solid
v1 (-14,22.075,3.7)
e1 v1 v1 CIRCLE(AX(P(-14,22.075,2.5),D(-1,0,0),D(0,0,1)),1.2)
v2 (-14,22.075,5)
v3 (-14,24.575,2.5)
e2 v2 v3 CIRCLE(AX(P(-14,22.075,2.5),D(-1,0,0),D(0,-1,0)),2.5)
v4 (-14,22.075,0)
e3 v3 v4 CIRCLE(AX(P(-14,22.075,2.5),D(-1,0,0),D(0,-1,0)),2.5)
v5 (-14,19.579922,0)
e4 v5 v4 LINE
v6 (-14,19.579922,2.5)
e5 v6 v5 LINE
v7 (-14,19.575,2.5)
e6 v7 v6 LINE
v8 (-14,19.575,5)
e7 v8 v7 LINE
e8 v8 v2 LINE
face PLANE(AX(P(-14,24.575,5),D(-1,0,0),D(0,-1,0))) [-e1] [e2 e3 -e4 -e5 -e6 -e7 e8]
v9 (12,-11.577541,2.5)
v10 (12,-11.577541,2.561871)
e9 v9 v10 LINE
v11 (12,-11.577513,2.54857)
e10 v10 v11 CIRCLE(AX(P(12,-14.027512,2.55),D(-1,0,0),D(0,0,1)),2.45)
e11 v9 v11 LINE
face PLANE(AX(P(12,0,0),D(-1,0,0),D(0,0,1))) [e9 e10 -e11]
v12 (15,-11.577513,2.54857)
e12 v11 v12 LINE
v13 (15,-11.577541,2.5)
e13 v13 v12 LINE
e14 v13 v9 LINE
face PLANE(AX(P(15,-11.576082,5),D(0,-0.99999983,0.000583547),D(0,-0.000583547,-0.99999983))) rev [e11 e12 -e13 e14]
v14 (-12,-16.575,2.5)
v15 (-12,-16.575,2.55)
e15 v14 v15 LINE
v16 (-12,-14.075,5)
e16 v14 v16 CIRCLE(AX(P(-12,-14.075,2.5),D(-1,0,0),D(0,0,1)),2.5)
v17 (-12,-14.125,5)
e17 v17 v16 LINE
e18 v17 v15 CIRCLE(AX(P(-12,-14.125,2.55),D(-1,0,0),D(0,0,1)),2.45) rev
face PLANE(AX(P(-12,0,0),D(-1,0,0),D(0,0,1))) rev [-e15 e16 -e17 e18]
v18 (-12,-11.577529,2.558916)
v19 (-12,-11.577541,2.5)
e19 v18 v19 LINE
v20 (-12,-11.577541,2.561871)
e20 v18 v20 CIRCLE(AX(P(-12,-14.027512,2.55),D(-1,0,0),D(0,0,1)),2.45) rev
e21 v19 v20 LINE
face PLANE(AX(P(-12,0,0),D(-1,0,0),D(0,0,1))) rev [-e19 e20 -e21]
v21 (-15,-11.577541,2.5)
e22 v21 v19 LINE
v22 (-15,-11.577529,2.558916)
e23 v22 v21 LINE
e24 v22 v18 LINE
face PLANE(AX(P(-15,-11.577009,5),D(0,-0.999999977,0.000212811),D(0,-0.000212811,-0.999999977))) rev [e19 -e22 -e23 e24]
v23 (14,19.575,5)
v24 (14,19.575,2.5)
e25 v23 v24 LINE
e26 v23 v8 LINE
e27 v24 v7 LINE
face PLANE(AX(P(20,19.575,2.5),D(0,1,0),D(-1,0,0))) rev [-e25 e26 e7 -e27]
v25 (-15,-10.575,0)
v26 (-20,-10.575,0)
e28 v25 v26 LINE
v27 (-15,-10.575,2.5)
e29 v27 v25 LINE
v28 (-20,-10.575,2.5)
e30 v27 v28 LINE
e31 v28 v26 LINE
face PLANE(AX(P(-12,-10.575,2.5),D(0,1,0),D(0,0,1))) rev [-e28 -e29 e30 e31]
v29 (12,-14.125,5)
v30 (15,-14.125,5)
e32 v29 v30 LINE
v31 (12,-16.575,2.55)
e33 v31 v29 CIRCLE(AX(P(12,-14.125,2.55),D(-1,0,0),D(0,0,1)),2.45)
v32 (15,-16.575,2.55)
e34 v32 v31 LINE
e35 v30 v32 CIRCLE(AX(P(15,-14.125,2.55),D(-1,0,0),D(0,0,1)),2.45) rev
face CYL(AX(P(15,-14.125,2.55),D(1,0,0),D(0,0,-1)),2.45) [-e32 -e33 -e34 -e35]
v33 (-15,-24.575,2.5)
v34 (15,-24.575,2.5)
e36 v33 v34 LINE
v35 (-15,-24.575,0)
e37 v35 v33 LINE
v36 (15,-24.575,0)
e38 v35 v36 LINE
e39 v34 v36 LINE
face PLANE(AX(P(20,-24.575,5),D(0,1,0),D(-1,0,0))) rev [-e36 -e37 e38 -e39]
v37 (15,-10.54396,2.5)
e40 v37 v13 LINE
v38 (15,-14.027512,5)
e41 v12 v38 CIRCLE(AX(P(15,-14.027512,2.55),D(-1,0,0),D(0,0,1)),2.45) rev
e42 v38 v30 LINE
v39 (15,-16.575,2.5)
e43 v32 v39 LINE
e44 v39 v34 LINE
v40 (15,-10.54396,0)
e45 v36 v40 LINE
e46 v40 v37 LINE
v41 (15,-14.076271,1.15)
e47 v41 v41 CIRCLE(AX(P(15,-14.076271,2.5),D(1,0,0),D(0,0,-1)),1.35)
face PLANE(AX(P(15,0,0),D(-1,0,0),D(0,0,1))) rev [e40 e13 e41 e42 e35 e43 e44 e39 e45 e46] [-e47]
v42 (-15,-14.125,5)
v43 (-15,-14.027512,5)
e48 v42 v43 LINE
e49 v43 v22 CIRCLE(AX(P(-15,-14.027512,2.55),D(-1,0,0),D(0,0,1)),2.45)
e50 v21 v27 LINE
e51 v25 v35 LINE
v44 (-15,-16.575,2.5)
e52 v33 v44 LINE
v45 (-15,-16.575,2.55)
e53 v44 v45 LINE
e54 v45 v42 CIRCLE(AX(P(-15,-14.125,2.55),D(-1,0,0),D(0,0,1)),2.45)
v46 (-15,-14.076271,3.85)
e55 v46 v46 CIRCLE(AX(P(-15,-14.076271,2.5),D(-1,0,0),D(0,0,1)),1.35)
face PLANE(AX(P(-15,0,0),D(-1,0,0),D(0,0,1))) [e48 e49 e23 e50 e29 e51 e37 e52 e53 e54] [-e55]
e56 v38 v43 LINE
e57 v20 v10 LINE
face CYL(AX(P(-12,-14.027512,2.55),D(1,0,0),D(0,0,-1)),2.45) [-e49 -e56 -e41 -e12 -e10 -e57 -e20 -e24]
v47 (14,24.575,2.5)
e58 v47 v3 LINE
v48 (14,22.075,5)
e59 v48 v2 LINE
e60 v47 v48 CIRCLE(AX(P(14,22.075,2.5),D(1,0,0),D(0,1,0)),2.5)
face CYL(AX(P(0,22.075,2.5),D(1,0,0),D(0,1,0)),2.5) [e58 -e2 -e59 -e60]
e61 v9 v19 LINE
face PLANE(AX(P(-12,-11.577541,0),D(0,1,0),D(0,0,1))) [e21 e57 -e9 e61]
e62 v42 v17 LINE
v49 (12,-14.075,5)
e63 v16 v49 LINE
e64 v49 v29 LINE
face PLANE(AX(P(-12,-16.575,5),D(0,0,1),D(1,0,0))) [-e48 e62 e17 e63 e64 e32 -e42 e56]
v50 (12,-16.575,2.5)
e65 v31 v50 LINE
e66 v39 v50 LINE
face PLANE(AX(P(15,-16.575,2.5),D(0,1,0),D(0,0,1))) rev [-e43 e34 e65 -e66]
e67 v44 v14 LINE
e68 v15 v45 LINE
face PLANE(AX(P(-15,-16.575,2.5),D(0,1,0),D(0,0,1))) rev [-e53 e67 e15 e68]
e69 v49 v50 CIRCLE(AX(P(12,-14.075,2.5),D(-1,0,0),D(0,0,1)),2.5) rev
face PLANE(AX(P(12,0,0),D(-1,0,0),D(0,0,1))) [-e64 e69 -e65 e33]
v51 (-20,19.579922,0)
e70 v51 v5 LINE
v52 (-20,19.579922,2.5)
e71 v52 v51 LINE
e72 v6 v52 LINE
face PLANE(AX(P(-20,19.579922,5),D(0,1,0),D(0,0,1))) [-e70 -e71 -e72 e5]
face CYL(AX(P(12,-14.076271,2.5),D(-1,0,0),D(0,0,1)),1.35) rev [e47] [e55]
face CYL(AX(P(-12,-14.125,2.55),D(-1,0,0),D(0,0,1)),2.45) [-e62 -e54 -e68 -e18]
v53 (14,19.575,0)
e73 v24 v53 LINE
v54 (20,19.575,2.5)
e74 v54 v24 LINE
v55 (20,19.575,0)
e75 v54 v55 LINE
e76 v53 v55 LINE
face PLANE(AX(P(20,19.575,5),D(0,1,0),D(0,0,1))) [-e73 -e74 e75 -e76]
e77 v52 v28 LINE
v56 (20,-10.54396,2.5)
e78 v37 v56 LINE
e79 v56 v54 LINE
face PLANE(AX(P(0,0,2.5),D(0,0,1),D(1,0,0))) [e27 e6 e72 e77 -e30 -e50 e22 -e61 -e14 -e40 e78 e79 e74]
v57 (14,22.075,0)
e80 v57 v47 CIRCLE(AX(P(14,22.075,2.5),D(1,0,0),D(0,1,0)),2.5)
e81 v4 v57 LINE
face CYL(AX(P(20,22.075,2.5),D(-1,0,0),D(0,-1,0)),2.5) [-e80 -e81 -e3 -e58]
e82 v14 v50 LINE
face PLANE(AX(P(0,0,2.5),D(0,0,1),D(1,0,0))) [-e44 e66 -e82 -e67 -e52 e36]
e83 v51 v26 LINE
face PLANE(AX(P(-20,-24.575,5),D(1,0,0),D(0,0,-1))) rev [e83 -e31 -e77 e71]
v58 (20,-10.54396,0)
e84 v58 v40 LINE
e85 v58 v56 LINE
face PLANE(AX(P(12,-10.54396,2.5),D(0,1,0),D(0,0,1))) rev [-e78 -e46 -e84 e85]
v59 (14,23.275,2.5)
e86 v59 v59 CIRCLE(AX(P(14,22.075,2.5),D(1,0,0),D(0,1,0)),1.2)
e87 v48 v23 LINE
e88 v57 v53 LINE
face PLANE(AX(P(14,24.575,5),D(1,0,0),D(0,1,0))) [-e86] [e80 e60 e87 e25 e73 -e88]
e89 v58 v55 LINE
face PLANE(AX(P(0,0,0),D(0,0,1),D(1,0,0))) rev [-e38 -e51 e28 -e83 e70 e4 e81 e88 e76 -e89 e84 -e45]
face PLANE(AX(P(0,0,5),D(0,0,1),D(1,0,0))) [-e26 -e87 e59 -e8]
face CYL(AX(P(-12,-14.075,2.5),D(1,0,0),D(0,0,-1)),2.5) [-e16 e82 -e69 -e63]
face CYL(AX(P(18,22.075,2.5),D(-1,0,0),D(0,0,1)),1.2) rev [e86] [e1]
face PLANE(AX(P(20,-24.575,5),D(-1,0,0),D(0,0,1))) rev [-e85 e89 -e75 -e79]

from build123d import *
from OCP.BRepAlgoAPI import BRepAlgoAPI_Cut
from OCP.TopTools import TopTools_ListOfShape
from OCP.BRepFilletAPI import BRepFilletAPI_MakeFillet

# Parameters (mm, degrees)
CROQUIS1_W              = 40
CROQUIS1_H              = 49.15
SALIENTE_EXTRUIR1_DEPTH = 5
CROQUIS5_W              = 6
CROQUIS5_H              = 4.995078359
CROQUIS5_H_2            = 5
CORTAR_EXTRUIR4_DEPTH   = 5
CROQUIS9_R              = 1.2
CORTAR_EXTRUIR8_DEPTH   = 32
REDONDEO1_R             = 2.5
CROQUIS12_W             = 39.999999512
CROQUIS12_H             = 44.15
CORTAR_EXTRUIR10_DEPTH  = 2.5
CROQUIS15_W             = 6
CROQUIS15_H             = 2.537629209
CORTAR_EXTRUIR11_DEPTH  = 0.01
CROQUIS17_W             = 2.5
CROQUIS17_H             = 4.997458943
SALIENTE_EXTRUIR2_DEPTH = 40
REDONDEO3_R             = 2.45
CROQUIS22_W             = 14
CROQUIS22_H             = 5
CORTAR_EXTRUIR13_DEPTH  = 5
CROQUIS25_W             = 5
CROQUIS25_H             = 7.03748993
CORTAR_EXTRUIR15_DEPTH  = 8
CROQUIS26_W             = 5
CROQUIS26_H             = 7
CORTAR_EXTRUIR16_DEPTH  = 8
CROQUIS29_W             = 5
CROQUIS29_H             = 4.997458943
SALIENTE_EXTRUIR3_DEPTH = 24
CROQUIS30_R             = 1.35
CORTAR_EXTRUIR17_DEPTH  = 24
REDONDEO4_R             = 2.5
REDONDEO4_R_2           = 2.4
CROQUIS31_W             = 2.5
CROQUIS31_H             = 4.997458943
CORTAR_EXTRUIR18_DEPTH  = 24
CROQUIS32_W             = 8.001194755
CROQUIS32_H             = 7
CORTAR_EXTRUIR19_DEPTH  = 2.5
CROQUIS33_W             = 8.001407562
CROQUIS33_H             = 6.993550445
CORTAR_EXTRUIR20_DEPTH  = 2.5
CROQUIS36_R             = 1.35
SALIENTE_EXTRUIR4_DEPTH = 3
SALIENTE_EXTRUIR5_START = 3
CROQUIS37_R             = 1.35
SALIENTE_EXTRUIR5_DEPTH = 3
REDONDEO5_R             = 2.45
REDONDEO6_R             = 2.45


# Some blends are built 0.0001 mm under size
with BuildPart() as part:
    # Croquis1 → Saliente-Extruir1 (new body)
    with BuildSketch(Plane.XY):
        Rectangle(CROQUIS1_W, CROQUIS1_H)
    extrude(amount=SALIENTE_EXTRUIR1_DEPTH)

    # Croquis5 → Cortar-Extruir4 (cut)
    with BuildSketch(Plane.XY):
        with Locations((-17, 22.077460821)):
            Rectangle(CROQUIS5_W, CROQUIS5_H)
        with Locations((17, 22.075)):
            Rectangle(CROQUIS5_W, CROQUIS5_H_2)
    extrude(amount=CORTAR_EXTRUIR4_DEPTH, mode=Mode.SUBTRACT)

    # Croquis9 → Cortar-Extruir8 (cut)
    with BuildSketch(Plane.ZY.offset(14)):
        with Locations((2.5, 22.075)):
            Circle(CROQUIS9_R)
    extrude(amount=-CORTAR_EXTRUIR8_DEPTH, mode=Mode.SUBTRACT)

    # Redondeo1
    redondeo1_edges = [part.edges().sort_by_distance(p)[0] for p in [
        (0, 24.575, 5),
        (0, 24.575, 0),
    ]]
    fillet(redondeo1_edges, radius=REDONDEO1_R - 0.0001)  # a hair under: the kernel refuses the full size


with BuildPart() as cortar_extruir10_tool:
    # Croquis12 → Cortar-Extruir10 (new body)
    with BuildSketch(Plane.XY.offset(5)):
        with Locations((2.44e-07, -2.5)):
            Rectangle(CROQUIS12_W, CROQUIS12_H)
    extrude(amount=-CORTAR_EXTRUIR10_DEPTH)


with BuildPart() as part_1:
    add(part.part)

    # Cortar-Extruir10: cut by cortar_extruir10_tool, with a tolerance
    cortar_extruir10_stock = TopTools_ListOfShape()
    cortar_extruir10_stock.Append(part_1.part.wrapped)
    cortar_extruir10_tools = TopTools_ListOfShape()
    cortar_extruir10_tools.Append(cortar_extruir10_tool.part.wrapped)
    cortar_extruir10_cut = BRepAlgoAPI_Cut()
    cortar_extruir10_cut.SetArguments(cortar_extruir10_stock)
    cortar_extruir10_cut.SetTools(cortar_extruir10_tools)
    cortar_extruir10_cut.SetFuzzyValue(0.00001)
    cortar_extruir10_cut.Build()
    add(Compound.cast(cortar_extruir10_cut.Shape()).solids(), mode=Mode.REPLACE)

    # Croquis15 → Cortar-Extruir11 (cut)
    with BuildSketch(Plane(origin=(0, 19.579921641, 0), x_dir=(1, 0, 0), z_dir=(0, 1, 0))):
        with Locations((-17, -3.768814605)):
            Rectangle(CROQUIS15_W, CROQUIS15_H)
    extrude(amount=-CORTAR_EXTRUIR11_DEPTH, mode=Mode.SUBTRACT)

    # Croquis17 → Saliente-Extruir2 (add)
    with BuildSketch(Plane.ZY.offset(20)):
        with Locations((-1.25, -14.076270529)):
            Rectangle(CROQUIS17_W, CROQUIS17_H)
    extrude(amount=-SALIENTE_EXTRUIR2_DEPTH)

    # Redondeo3
    redondeo3_edges = [part_1.edges().sort_by_distance(p)[0] for p in [
        (0, -16.575, -2.5),
        (0, -11.577541057, -2.5),
    ]]
    fillet(redondeo3_edges, radius=REDONDEO3_R)

    # Croquis22 → Cortar-Extruir13 (cut)
    with BuildSketch(Plane.XZ.offset(16.575)):
        with Locations((0, -2.5)):
            Rectangle(CROQUIS22_W, CROQUIS22_H)
    extrude(amount=-CORTAR_EXTRUIR13_DEPTH, mode=Mode.SUBTRACT)

    # Croquis25 → Cortar-Extruir15 (cut)
    with BuildSketch(Plane(origin=(20, 0, 0), x_dir=(0, 0, -1), z_dir=(1, 0, 0))):
        with Locations((0, -14.06270459)):
            Rectangle(CROQUIS25_W, CROQUIS25_H)
    extrude(amount=-CORTAR_EXTRUIR15_DEPTH, mode=Mode.SUBTRACT)

    # Croquis26 → Cortar-Extruir16 (cut)
    with BuildSketch(Plane.ZY.offset(20)):
        with Locations((0, -14.075)):
            Rectangle(CROQUIS26_W, CROQUIS26_H)
    extrude(amount=-CORTAR_EXTRUIR16_DEPTH, mode=Mode.SUBTRACT)

    # Croquis29 → Saliente-Extruir3 (add)
    with BuildSketch(Plane(origin=(12, 0, 0), x_dir=(0, 0, -1), z_dir=(1, 0, 0))):
        with Locations((-2.5, -14.076270529)):
            Rectangle(CROQUIS29_W, CROQUIS29_H)
    extrude(amount=-SALIENTE_EXTRUIR3_DEPTH)

    # Croquis30 → Cortar-Extruir17 (cut)
    with BuildSketch(Plane.ZY.offset(12)):
        with Locations((2.5, -14.076270528)):
            Circle(CROQUIS30_R)
    extrude(amount=-CORTAR_EXTRUIR17_DEPTH, mode=Mode.SUBTRACT)

    # Redondeo4
    redondeo4_edges_1 = [part_1.edges().sort_by_distance(p)[0] for p in [
        (0, -16.575, 5),
    ]]
    redondeo4_edges_2 = [part_1.edges().sort_by_distance(p)[0] for p in [
        (0, -11.577541057, 5),
    ]]
    redondeo4 = BRepFilletAPI_MakeFillet(part_1.part.solid().wrapped)
    for e in redondeo4_edges_1:
        redondeo4.Add(REDONDEO4_R - 0.0001, e.wrapped)
    for e in redondeo4_edges_2:
        redondeo4.Add(REDONDEO4_R_2 - 0.0001, e.wrapped)
    add(Compound.cast(redondeo4.Shape()), mode=Mode.REPLACE)  # a hair under: the kernel refuses the full size

    # Croquis31 → Cortar-Extruir18 (cut)
    with BuildSketch(Plane(origin=(12, 0, 0), x_dir=(0, 0, -1), z_dir=(1, 0, 0))):
        with Locations((1.25, -14.076270529)):
            Rectangle(CROQUIS31_W, CROQUIS31_H)
    extrude(amount=-CORTAR_EXTRUIR18_DEPTH, mode=Mode.SUBTRACT)

    # Croquis32 → Cortar-Extruir19 (cut)
    with BuildSketch(Plane.XY.offset(2.5)):
        with Locations((-16.000597378, -21.075)):
            Rectangle(CROQUIS32_W, CROQUIS32_H)
    extrude(amount=-CORTAR_EXTRUIR19_DEPTH, mode=Mode.SUBTRACT)

    # Croquis33 → Cortar-Extruir20 (cut)
    with BuildSketch(Plane.XY.offset(2.5)):
        with Locations((16.000703781, -21.078224778)):
            Rectangle(CROQUIS33_W, CROQUIS33_H)
    extrude(amount=-CORTAR_EXTRUIR20_DEPTH, mode=Mode.SUBTRACT)

    # Croquis36 → Saliente-Extruir4 (add)
    with BuildSketch(Plane(origin=(12, 0, 0), x_dir=(0, 0, -1), z_dir=(1, 0, 0))):
        Polygon((0, -24.575), (-2.5, -24.575), (-2.5, -16.575), (-5, -16.575), (-5, -11.576082189), (-2.5, -11.577541057), (-2.5, -10.543959625), (0, -10.543959625), align=None)
        with Locations(Location((-2.5, -14.076270528, 0), (0, 0, 180))):
            Circle(CROQUIS36_R, mode=Mode.SUBTRACT)
    extrude(amount=SALIENTE_EXTRUIR4_DEPTH)

    # Croquis37 → Saliente-Extruir5 (add)
    with BuildSketch(Plane.ZY.offset(12).offset(SALIENTE_EXTRUIR5_START)):
        Polygon((0, -24.575), (2.5, -24.575), (2.5, -16.575), (5, -16.575), (5, -11.57700903), (2.5, -11.577541057), (2.5, -10.575), (0, -10.575), align=None)
        with Locations((2.5, -14.076270528)):
            Circle(CROQUIS37_R, mode=Mode.SUBTRACT)
    extrude(amount=-SALIENTE_EXTRUIR5_DEPTH)

    # Redondeo5
    # the kernel refuses this fillet: 2.45 mm, written as the material it takes off along each edge
    with BuildSketch(Plane(origin=(-2.708580643, -11.576082189, 5), x_dir=(0, -1, 0), z_dir=(1, 0, 0))) as redondeo5_piece_1:
        with BuildLine():
            CenterArc((REDONDEO5_R * 1.00058371722, REDONDEO5_R), REDONDEO5_R, 179.966565226, 90.033434774)
            Line((REDONDEO5_R * 0.000583887478773, REDONDEO5_R * 1.00058354685), (-REDONDEO5_R * 0.019416109116, REDONDEO5_R * 1.00059521779))
            Line((-REDONDEO5_R * 0.019416109116, REDONDEO5_R * 1.00059521779), (-REDONDEO5_R * 0.0200116743443, -REDONDEO5_R * 0.02))
            Line((-REDONDEO5_R * 0.0200116743443, -REDONDEO5_R * 0.02), (REDONDEO5_R * 1.00058371722, -REDONDEO5_R * 0.02))
            Line((REDONDEO5_R * 1.00058371722, -REDONDEO5_R * 0.02), (REDONDEO5_R * 1.00058371722, 0))
        make_face()
    extrude(amount=32.417161286, mode=Mode.SUBTRACT)
    with BuildSketch(Plane(origin=(-2.7, -16.575, 5), x_dir=(0, 0, -1), z_dir=(1, 0, 0))) as redondeo5_piece_2:
        with BuildLine():
            CenterArc((REDONDEO5_R, REDONDEO5_R), REDONDEO5_R, 180, 90)
            Line((0, REDONDEO5_R), (-REDONDEO5_R * 0.02, REDONDEO5_R))
            Line((-REDONDEO5_R * 0.02, REDONDEO5_R), (-REDONDEO5_R * 0.02, -REDONDEO5_R * 0.02))
            Line((-REDONDEO5_R * 0.02, -REDONDEO5_R * 0.02), (REDONDEO5_R, -REDONDEO5_R * 0.02))
            Line((REDONDEO5_R, -REDONDEO5_R * 0.02), (REDONDEO5_R, 0))
        make_face()
    extrude(amount=32.4, mode=Mode.SUBTRACT)
    with BuildSketch(Plane(origin=(-29.703128651, -11.57700903, 5), x_dir=(0, -1, 0), z_dir=(1, 0, 0))) as redondeo5_piece_3:
        with BuildLine():
            CenterArc((REDONDEO5_R * 1.00021283342, REDONDEO5_R), REDONDEO5_R, 179.987806841, 90.012193159)
            Line((REDONDEO5_R * 0.000212856064231, REDONDEO5_R * 1.00021281077), (-REDONDEO5_R * 0.0197871434829, REDONDEO5_R * 1.00021706699))
            Line((-REDONDEO5_R * 0.0197871434829, REDONDEO5_R * 1.00021706699), (-REDONDEO5_R * 0.0200042566684, -REDONDEO5_R * 0.02))
            Line((-REDONDEO5_R * 0.0200042566684, -REDONDEO5_R * 0.02), (REDONDEO5_R * 1.00021283342, -REDONDEO5_R * 0.02))
            Line((REDONDEO5_R * 1.00021283342, -REDONDEO5_R * 0.02), (REDONDEO5_R * 1.00021283342, 0))
        make_face()
    extrude(amount=32.406257303, mode=Mode.SUBTRACT)

    # Redondeo6
    redondeo6_edges = [part_1.edges().sort_by_distance(p)[0] for p in [
        (-13.5, -16.575, 5),
    ]]
    fillet(redondeo6_edges, radius=REDONDEO6_R)


solid = part_1.part
